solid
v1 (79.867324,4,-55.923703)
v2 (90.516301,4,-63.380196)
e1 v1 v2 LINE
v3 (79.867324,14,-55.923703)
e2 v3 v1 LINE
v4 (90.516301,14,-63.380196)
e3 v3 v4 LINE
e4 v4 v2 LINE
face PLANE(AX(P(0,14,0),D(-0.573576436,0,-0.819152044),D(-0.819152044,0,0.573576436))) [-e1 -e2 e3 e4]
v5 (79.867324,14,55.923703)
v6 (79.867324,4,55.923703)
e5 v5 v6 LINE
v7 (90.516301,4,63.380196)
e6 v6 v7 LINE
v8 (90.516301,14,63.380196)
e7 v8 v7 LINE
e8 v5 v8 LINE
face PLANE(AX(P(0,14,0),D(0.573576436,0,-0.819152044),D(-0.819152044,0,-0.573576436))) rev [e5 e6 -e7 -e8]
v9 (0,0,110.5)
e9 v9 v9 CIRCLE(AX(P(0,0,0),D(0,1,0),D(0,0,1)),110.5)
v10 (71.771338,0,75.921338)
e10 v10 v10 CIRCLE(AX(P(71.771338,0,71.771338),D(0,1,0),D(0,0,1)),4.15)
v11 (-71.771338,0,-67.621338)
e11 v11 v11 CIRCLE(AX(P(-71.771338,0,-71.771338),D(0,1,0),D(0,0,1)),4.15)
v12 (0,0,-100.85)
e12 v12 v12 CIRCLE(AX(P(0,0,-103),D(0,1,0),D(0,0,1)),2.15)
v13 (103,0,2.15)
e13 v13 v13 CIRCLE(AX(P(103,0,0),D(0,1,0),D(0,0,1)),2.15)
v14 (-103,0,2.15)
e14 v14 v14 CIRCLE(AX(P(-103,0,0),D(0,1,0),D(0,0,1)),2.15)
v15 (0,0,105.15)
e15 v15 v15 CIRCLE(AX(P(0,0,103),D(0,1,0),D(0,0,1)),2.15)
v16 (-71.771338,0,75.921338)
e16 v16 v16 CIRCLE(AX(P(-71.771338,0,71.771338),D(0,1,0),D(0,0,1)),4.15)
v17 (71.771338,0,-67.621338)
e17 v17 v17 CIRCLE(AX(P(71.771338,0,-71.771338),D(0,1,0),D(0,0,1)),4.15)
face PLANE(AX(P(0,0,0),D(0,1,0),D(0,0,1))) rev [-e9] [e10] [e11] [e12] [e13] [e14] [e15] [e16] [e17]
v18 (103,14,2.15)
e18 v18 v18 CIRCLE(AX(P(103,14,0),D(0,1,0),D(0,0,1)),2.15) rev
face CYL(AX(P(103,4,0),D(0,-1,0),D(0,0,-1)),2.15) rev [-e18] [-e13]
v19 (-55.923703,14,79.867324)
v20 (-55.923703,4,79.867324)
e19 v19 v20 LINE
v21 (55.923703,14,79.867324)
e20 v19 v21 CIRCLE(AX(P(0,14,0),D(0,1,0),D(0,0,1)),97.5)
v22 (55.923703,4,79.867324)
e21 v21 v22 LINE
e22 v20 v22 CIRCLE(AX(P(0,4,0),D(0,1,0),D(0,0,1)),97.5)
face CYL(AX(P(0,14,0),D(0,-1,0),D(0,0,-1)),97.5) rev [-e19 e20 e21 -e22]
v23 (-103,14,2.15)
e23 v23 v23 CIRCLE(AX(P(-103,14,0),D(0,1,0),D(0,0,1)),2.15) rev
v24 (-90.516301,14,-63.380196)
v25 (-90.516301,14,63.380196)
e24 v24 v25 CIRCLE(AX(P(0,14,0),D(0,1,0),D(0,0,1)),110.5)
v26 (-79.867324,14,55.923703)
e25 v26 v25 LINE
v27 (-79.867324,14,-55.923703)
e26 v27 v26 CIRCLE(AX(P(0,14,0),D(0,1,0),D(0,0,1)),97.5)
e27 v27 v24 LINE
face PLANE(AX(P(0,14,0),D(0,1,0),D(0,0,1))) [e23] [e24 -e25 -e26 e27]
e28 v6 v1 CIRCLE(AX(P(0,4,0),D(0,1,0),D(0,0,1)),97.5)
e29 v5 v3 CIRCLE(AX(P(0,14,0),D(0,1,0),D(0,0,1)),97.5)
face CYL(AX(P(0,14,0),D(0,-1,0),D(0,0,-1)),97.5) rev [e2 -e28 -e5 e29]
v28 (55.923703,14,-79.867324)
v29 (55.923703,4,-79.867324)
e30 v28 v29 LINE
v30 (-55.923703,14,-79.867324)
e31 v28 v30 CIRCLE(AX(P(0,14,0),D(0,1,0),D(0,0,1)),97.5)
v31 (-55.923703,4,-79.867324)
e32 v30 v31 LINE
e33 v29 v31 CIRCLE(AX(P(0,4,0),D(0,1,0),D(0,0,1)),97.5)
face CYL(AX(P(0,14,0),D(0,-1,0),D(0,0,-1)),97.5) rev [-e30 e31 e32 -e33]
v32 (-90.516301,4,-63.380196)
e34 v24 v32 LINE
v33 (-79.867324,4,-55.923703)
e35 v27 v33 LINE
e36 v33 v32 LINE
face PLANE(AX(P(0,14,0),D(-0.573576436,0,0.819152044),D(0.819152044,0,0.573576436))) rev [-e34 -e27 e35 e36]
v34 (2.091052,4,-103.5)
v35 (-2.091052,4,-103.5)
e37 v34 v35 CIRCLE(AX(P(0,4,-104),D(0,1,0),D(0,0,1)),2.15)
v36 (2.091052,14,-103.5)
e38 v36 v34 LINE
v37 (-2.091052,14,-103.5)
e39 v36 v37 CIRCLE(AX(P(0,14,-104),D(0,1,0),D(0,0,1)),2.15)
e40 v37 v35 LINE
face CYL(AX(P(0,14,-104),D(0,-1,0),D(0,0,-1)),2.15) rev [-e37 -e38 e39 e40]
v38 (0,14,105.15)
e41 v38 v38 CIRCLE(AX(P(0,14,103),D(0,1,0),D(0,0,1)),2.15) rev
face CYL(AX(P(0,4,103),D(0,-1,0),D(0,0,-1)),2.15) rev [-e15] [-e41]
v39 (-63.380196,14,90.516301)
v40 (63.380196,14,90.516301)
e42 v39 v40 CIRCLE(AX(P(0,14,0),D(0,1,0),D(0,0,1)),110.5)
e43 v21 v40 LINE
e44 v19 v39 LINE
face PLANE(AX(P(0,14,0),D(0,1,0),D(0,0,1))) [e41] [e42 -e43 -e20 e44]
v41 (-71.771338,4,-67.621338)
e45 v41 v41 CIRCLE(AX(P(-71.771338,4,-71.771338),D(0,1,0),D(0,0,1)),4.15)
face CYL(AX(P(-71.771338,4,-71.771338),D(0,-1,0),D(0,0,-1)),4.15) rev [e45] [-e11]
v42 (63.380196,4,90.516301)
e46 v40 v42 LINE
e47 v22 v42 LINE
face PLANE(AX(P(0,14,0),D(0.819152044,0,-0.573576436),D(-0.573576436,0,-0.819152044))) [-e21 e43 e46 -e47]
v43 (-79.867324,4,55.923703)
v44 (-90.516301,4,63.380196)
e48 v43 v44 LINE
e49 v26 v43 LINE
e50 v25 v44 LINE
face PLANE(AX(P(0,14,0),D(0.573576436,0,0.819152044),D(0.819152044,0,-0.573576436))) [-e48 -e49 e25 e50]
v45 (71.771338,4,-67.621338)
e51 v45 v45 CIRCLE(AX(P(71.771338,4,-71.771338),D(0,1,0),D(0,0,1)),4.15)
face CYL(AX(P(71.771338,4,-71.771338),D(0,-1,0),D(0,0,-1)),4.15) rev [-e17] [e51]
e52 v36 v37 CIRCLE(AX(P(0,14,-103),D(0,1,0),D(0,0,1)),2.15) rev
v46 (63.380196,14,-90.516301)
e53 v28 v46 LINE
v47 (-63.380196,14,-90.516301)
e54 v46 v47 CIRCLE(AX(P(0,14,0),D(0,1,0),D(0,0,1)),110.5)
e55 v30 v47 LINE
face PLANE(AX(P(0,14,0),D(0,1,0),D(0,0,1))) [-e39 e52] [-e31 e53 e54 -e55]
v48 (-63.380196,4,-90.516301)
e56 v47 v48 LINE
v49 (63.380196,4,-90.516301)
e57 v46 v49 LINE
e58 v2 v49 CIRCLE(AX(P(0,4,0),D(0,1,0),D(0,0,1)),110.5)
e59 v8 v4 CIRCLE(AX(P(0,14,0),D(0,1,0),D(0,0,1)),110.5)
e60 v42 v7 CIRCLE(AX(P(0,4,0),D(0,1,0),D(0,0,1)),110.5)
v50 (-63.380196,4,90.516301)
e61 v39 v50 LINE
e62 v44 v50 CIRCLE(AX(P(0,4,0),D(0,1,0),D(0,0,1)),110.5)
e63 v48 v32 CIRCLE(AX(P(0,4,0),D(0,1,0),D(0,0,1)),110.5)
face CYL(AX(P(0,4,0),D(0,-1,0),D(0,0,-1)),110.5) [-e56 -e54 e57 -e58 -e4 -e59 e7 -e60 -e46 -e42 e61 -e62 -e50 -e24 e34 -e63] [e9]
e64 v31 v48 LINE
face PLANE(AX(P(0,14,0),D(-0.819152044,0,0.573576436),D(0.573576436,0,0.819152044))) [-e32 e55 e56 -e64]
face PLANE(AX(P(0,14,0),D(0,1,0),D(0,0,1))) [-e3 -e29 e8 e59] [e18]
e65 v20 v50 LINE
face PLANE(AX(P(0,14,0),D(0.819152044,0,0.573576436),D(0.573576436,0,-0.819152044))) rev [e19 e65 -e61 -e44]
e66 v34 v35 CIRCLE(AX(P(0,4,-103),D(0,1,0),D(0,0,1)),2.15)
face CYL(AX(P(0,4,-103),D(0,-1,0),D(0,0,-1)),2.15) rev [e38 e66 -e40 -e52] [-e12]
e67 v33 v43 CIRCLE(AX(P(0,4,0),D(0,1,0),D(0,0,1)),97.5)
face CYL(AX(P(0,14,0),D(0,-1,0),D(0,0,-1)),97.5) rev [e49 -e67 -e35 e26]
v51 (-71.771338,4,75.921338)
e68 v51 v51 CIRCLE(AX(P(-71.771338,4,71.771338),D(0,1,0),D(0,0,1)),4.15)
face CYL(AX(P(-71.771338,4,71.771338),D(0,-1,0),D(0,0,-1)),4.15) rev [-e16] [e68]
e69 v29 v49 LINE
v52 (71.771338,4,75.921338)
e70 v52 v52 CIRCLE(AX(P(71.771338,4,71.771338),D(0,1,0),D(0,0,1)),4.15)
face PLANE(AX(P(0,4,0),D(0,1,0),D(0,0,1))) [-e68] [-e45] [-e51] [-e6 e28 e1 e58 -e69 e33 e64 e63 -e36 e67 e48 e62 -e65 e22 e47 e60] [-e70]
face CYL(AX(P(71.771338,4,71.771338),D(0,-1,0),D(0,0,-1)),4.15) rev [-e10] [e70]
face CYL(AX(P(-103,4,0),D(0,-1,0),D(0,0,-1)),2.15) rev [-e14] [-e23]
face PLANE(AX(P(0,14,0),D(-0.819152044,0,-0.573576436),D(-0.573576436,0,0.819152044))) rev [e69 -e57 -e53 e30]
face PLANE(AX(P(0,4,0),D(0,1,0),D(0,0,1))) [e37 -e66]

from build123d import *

# Parameters (mm, degrees)
SCHIZZO1_R                       = 110.5
SCHIZZO1_R_2                     = 2.15
SCHIZZO1_R_3                     = 4.15
ESTRUSIONE_ESTRUSIONE1_DEPTH     = 4
ESTRUSIONE_ESTRUSIONE2_OUTLINE_R = 2.15
ESTRUSIONE_ESTRUSIONE2_DEPTH     = 10


# Read off the part's stored shape, not the designer's step: Estrusione-Estrusione2
with BuildPart() as part:
    # Schizzo1 → Estrusione-Estrusione1 (new body)
    with BuildSketch(Plane(origin=(0, 0, 0), x_dir=(1, 0, 0), z_dir=(0, 1, 0))):
        with Locations(Location((0, 0, 0), (0, 0, 270))):
            Circle(SCHIZZO1_R)
        with Locations(Location((-103, 0, 0), (0, 0, 270))):
            Circle(SCHIZZO1_R_2, mode=Mode.SUBTRACT)
        with Locations(Location((0, 103, 0), (0, 0, 270))):
            Circle(SCHIZZO1_R_2, mode=Mode.SUBTRACT)
        with Locations(Location((103, 0, 0), (0, 0, 270))):
            Circle(SCHIZZO1_R_2, mode=Mode.SUBTRACT)
        with Locations(Location((0, -103, 0), (0, 0, 270))):
            Circle(SCHIZZO1_R_2, mode=Mode.SUBTRACT)
        with Locations(Location((-71.77133829, 71.77133829, 0), (0, 0, 270))):
            Circle(SCHIZZO1_R_3, mode=Mode.SUBTRACT)
        with Locations(Location((71.77133829, 71.77133829, 0), (0, 0, 270))):
            Circle(SCHIZZO1_R_3, mode=Mode.SUBTRACT)
        with Locations(Location((71.77133829, -71.77133829, 0), (0, 0, 270))):
            Circle(SCHIZZO1_R_3, mode=Mode.SUBTRACT)
        with Locations(Location((-71.77133829, -71.77133829, 0), (0, 0, 270))):
            Circle(SCHIZZO1_R_3, mode=Mode.SUBTRACT)
    extrude(amount=ESTRUSIONE_ESTRUSIONE1_DEPTH)

    # Estrusione-Estrusione2 outline → Estrusione-Estrusione2 (add)
    # profile 1 of 4: a face of its own
    with BuildSketch(Plane(origin=(0, 4, 0), x_dir=(1, 0, 0), z_dir=(0, 1, 0))):
        with BuildLine():
            ThreePointArc((90.516300894, -63.380196217), (110.5, 0), (90.516300894, 63.380196217))
            Line((90.516300894, 63.380196217), (79.867324318, 55.923702544))
            ThreePointArc((79.867324318, 55.923702544), (97.5, 0), (79.867324318, -55.923702544))
            Line((79.867324318, -55.923702544), (90.516300894, -63.380196217))
        make_face()
        with Locations((103, 0)):
            Circle(ESTRUSIONE_ESTRUSIONE2_OUTLINE_R, mode=Mode.SUBTRACT)
    # profile 2 of 4: a face of its own
    with BuildSketch(Plane(origin=(0, 4, 0), x_dir=(1, 0, 0), z_dir=(0, 1, 0))):
        with BuildLine():
            Line((55.923702544, 79.867324318), (63.380196217, 90.516300894))
            ThreePointArc((63.380196217, 90.516300894), (0, 110.5), (-63.380196217, 90.516300894))
            Line((-63.380196217, 90.516300894), (-55.923702544, 79.867324318))
            ThreePointArc((-55.923702544, 79.867324318), (0, 97.5), (55.923702544, 79.867324318))
        make_face()
        with BuildLine():
            ThreePointArc((2.091052367, 103.5), (0, 100.85), (-2.091052367, 103.5))
            ThreePointArc((-2.091052367, 103.5), (0, 106.15), (2.091052367, 103.5))
        make_face(mode=Mode.SUBTRACT)
    # profile 3 of 4: a face of its own
    with BuildSketch(Plane(origin=(0, 4, 0), x_dir=(1, 0, 0), z_dir=(0, 1, 0))):
        with BuildLine():
            ThreePointArc((-63.380196217, -90.516300894), (0, -110.5), (63.380196217, -90.516300894))
            Line((63.380196217, -90.516300894), (55.923702544, -79.867324318))
            ThreePointArc((55.923702544, -79.867324318), (0, -97.5), (-55.923702544, -79.867324318))
            Line((-55.923702544, -79.867324318), (-63.380196217, -90.516300894))
        make_face()
        with Locations((0, -103)):
            Circle(ESTRUSIONE_ESTRUSIONE2_OUTLINE_R, mode=Mode.SUBTRACT)
    # profile 4 of 4: a face of its own
    with BuildSketch(Plane(origin=(0, 4, 0), x_dir=(1, 0, 0), z_dir=(0, 1, 0))):
        with BuildLine():
            Line((-79.867324318, 55.923702544), (-90.516300894, 63.380196217))
            ThreePointArc((-90.516300894, 63.380196217), (-110.5, 0), (-90.516300894, -63.380196217))
            Line((-90.516300894, -63.380196217), (-79.867324318, -55.923702544))
            ThreePointArc((-79.867324318, -55.923702544), (-97.5, 0), (-79.867324318, 55.923702544))
        make_face()
        with Locations((-103, 0)):
            Circle(ESTRUSIONE_ESTRUSIONE2_OUTLINE_R, mode=Mode.SUBTRACT)
    extrude(amount=ESTRUSIONE_ESTRUSIONE2_DEPTH)


solid = part.part
